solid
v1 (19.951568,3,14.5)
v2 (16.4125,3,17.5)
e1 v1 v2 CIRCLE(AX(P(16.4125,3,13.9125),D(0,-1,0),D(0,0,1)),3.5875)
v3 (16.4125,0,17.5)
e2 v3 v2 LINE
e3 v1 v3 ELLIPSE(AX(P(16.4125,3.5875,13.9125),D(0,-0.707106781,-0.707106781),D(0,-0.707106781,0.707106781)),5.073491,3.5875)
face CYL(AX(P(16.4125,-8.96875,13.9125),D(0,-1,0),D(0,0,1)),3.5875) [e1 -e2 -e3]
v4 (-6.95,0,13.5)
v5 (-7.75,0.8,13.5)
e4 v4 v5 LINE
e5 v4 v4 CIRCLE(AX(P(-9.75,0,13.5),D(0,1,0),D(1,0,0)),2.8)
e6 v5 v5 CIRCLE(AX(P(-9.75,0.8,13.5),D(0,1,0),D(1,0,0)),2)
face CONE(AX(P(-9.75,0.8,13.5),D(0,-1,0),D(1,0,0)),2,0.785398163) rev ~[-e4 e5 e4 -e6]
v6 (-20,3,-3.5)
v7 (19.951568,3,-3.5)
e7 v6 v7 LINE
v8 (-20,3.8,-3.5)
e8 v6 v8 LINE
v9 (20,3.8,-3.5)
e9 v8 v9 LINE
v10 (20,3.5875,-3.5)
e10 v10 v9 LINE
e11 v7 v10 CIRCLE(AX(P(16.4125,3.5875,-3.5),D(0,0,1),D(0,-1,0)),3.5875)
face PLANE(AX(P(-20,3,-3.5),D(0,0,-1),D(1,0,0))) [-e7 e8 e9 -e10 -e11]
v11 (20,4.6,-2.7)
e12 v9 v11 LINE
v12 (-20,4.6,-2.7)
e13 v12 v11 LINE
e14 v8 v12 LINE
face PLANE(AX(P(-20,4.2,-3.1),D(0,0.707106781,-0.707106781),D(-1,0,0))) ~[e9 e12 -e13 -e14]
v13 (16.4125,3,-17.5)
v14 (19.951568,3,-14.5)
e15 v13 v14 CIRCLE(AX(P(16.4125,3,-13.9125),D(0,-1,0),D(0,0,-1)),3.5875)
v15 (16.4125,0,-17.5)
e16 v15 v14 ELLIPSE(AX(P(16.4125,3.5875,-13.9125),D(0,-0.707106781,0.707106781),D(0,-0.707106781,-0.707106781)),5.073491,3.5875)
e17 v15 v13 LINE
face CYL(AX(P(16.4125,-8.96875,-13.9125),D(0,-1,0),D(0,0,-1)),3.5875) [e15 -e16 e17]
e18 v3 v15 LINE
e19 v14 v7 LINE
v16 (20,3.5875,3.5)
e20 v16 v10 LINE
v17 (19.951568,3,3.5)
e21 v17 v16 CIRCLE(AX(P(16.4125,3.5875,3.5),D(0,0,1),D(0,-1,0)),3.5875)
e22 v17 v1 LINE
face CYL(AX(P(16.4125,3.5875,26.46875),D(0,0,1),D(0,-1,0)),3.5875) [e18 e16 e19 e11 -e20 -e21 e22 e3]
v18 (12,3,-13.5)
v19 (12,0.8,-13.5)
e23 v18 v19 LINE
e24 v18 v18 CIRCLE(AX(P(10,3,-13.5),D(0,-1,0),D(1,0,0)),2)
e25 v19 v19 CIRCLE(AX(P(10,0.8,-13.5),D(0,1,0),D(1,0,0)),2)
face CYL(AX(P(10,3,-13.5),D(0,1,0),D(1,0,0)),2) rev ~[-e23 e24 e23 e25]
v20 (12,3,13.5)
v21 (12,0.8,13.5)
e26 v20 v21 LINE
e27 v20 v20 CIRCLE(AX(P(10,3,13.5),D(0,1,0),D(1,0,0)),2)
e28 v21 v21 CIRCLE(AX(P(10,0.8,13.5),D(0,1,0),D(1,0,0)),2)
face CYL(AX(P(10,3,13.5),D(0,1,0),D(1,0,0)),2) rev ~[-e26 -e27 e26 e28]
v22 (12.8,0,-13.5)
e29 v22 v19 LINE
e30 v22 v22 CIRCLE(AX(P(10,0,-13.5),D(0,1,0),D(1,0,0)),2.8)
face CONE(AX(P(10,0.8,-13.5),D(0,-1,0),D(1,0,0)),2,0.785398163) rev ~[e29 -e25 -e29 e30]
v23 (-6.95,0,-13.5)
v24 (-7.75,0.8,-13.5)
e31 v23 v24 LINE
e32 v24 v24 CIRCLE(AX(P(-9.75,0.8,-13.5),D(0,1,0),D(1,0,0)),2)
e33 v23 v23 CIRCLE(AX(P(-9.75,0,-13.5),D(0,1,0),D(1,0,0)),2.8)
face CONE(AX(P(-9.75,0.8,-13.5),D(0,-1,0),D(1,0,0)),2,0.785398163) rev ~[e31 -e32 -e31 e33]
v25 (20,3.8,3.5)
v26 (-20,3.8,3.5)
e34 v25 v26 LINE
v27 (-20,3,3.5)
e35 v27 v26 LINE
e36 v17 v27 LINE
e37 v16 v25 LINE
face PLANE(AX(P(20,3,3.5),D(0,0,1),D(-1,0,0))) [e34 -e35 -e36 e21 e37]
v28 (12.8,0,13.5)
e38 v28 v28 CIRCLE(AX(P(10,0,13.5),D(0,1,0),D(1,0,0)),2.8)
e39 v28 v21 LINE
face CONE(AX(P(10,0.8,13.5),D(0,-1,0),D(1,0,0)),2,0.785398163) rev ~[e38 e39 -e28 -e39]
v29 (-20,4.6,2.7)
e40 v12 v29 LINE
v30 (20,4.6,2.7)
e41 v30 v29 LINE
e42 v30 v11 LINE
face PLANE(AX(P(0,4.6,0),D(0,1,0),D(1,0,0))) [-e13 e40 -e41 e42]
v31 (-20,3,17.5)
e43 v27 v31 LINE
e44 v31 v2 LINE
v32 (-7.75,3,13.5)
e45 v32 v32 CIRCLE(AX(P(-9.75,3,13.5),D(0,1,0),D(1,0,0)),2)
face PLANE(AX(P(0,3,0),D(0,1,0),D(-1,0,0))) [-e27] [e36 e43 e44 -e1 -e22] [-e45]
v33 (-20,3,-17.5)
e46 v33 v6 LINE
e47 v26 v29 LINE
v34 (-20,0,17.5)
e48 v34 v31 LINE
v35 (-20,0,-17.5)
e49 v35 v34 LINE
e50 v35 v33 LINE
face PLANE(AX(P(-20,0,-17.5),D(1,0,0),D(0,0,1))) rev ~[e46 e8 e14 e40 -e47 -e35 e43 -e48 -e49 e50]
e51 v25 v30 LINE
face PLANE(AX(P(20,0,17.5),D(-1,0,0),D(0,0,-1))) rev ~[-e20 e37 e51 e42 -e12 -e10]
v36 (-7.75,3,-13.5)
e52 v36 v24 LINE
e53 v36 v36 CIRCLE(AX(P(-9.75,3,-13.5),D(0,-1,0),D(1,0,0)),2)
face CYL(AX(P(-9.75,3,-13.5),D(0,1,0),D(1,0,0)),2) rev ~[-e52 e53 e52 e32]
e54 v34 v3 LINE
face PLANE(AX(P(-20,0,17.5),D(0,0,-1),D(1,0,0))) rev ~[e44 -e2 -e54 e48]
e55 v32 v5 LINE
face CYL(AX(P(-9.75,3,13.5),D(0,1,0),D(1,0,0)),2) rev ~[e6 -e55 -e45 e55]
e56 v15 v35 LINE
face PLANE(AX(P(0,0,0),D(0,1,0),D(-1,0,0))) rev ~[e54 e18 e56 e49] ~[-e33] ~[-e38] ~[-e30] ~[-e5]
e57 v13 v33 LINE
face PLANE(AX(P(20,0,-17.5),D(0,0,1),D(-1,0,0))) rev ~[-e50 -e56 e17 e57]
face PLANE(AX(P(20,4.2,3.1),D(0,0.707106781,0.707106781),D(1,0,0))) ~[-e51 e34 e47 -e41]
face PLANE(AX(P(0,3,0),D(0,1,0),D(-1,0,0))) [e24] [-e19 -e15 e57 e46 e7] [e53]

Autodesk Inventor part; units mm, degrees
ref_plane "YZ Plane" through (0, 0, 0) normal (1, 0, 0) x (0, 1, 0)
ref_plane "XZ Plane" through (0, 0, 0) normal (0, 1, 0) x (-1, 0, 0)
ref_plane "XY Plane" through (0, 0, 0) normal (0, 0, 1) x (1, 0, 0)
sketch "Sketch2" plane through (0, 0, 0) normal (0, 1, 0) x (-1, 0, 0)
  line L0 (20, 17.5) -> (-20, 17.5)
  line L1 (-20, 17.5) -> (-20, -17.5)
  line L2 (-20, -17.5) -> (20, -17.5)
  line L3 (20, -17.5) -> (20, 17.5)
  point P0 (0, 0)
  point P1 (20, 0)
  point P2 (0, -17.5)
  dimension "d0" = 40
  dimension "d1" = 35
extrude "Extrusion1" add sketch "Sketch2" along normal blind 3
sketch "Sketch3" plane through (0, 3, 0) normal (0, 1, 0) x (1, 0, 0)
  line L0 (-20, -17.5) -> (20, -17.5) projected
  line L1 (20, -17.5) -> (20, 17.5) projected
  line L2 (20, 17.5) -> (-20, 17.5) projected
  line L3 (-20, 17.5) -> (-20, -17.5) projected
  line L4 (-20, 0) -> (20, 0)
  line L5 (0, 0) -> (-9.75, 0)
  line L6 (-9.75, 0) -> (-9.75, 17.5)
  line L7 (0, 0) -> (9.75, 0)
  line L8 (9.75, 0) -> (9.75, 17.5)
  line L9 (0, 0) -> (0, 13.5)
  line L10 (0, 13.5) -> (-20, 13.5)
  line L11 (0, 13.5) -> (20, 13.5)
  circle A0 centre (10, 13.5) radius 2
  circle A1 centre (-9.75, 13.5) radius 2
  circle A2 centre (10, -13.5) radius 2
  circle A3 centre (-9.75, -13.5) radius 2
  dimension "d4" = 9.75
  dimension "d5" = 9.75
  dimension "d6" = 13.5
  dimension "d7" = 4
  dimension "d8" = 4
extrude "Extrusion2" cut sketch "Sketch3" against normal through all contours A1 L6 L10 | L10 L6 A1 | L6 L10 A1 | A0 L8 L11 | L11 L8 A0 | A0 L11 L8 | L6 A1 L10 | L11 A0 L8 | A2 | A3
sketch "Sketch4" plane through (0, 3, 0) normal (0, 1, 0) x (1, 0, 0)
  circle A0 centre (10, -13.5) radius 2 projected
  circle A1 centre (-9.75, 13.5) radius 2 projected
  circle A2 centre (10, 13.5) radius 2 projected
  circle A3 centre (-9.75, -13.5) radius 2 projected
  line L0 (-20, -17.5) -> (20, -17.5) projected
  line L1 (20, -17.5) -> (20, 17.5) projected
  line L2 (20, 17.5) -> (-20, 17.5) projected
  line L3 (-20, 17.5) -> (-20, -17.5) projected
  line L4 (20, -3.5) -> (-20, -3.5)
  line L5 (-20, -3.5) -> (-20, 3.5)
  line L6 (-20, 3.5) -> (20, 3.5)
  line L7 (20, 3.5) -> (20, -3.5)
  line L8 (20, -3.5) -> (-20, 3.5) construction
  line L9 (-20, -3.5) -> (20, 3.5) construction
  point P0 (0, 0)
  dimension "d11" = 7
extrude "Extrusion3" add sketch "Sketch4" along normal blind 1.6 contours L3 L6 L1 L4
fillet "Fillet1" radius 3.5875 3 edges at (20, 1.5, 17.5) (20, 1.5, -17.5) (20, 0, 0)
sketch "Sketch5" plane through (0, 0, 0) normal (0, -1, 0) x (1, 0, 0)
  circle A0 centre (-9.75, 13.5) radius 2 projected
  circle A1 centre (10, -13.5) radius 2 projected
  circle A2 centre (-9.75, -13.5) radius 2 projected
  circle A3 centre (10, 13.5) radius 2 projected
  line L0 (16.4125, 17.5) -> (16.4125, -17.5) projected
  line L1 (-20, 17.5) -> (16.4125, 17.5) projected
  line L2 (-20, -17.5) -> (-20, 17.5) projected
  line L3 (16.4125, -17.5) -> (-20, -17.5) projected
  circle A4 centre (-9.75, 13.5) radius 3
  circle A5 centre (10, 13.5) radius 3
  circle A6 centre (10, -13.5) radius 3
  circle A7 centre (-9.75, -13.5) radius 3
  point P0 (0, 0)
  dimension "d15" = 1
  dimension "d16" = 1
  dimension "d17" = 1
  dimension "d18" = 1
chamfer "Chamfer1" distance 0.8 angle 45 4 edges at (-11.75, 0, -13.5) (-11.75, 0, 13.5) (8, 0, 13.5) (8, 0, -13.5)
chamfer "Chamfer2" distance 0.8 angle 45 2 edges at (0, 4.6, 3.5) (0, 4.6, -3.5)
properties part number "RearCarriageSupport" material "ABS Plastic"
